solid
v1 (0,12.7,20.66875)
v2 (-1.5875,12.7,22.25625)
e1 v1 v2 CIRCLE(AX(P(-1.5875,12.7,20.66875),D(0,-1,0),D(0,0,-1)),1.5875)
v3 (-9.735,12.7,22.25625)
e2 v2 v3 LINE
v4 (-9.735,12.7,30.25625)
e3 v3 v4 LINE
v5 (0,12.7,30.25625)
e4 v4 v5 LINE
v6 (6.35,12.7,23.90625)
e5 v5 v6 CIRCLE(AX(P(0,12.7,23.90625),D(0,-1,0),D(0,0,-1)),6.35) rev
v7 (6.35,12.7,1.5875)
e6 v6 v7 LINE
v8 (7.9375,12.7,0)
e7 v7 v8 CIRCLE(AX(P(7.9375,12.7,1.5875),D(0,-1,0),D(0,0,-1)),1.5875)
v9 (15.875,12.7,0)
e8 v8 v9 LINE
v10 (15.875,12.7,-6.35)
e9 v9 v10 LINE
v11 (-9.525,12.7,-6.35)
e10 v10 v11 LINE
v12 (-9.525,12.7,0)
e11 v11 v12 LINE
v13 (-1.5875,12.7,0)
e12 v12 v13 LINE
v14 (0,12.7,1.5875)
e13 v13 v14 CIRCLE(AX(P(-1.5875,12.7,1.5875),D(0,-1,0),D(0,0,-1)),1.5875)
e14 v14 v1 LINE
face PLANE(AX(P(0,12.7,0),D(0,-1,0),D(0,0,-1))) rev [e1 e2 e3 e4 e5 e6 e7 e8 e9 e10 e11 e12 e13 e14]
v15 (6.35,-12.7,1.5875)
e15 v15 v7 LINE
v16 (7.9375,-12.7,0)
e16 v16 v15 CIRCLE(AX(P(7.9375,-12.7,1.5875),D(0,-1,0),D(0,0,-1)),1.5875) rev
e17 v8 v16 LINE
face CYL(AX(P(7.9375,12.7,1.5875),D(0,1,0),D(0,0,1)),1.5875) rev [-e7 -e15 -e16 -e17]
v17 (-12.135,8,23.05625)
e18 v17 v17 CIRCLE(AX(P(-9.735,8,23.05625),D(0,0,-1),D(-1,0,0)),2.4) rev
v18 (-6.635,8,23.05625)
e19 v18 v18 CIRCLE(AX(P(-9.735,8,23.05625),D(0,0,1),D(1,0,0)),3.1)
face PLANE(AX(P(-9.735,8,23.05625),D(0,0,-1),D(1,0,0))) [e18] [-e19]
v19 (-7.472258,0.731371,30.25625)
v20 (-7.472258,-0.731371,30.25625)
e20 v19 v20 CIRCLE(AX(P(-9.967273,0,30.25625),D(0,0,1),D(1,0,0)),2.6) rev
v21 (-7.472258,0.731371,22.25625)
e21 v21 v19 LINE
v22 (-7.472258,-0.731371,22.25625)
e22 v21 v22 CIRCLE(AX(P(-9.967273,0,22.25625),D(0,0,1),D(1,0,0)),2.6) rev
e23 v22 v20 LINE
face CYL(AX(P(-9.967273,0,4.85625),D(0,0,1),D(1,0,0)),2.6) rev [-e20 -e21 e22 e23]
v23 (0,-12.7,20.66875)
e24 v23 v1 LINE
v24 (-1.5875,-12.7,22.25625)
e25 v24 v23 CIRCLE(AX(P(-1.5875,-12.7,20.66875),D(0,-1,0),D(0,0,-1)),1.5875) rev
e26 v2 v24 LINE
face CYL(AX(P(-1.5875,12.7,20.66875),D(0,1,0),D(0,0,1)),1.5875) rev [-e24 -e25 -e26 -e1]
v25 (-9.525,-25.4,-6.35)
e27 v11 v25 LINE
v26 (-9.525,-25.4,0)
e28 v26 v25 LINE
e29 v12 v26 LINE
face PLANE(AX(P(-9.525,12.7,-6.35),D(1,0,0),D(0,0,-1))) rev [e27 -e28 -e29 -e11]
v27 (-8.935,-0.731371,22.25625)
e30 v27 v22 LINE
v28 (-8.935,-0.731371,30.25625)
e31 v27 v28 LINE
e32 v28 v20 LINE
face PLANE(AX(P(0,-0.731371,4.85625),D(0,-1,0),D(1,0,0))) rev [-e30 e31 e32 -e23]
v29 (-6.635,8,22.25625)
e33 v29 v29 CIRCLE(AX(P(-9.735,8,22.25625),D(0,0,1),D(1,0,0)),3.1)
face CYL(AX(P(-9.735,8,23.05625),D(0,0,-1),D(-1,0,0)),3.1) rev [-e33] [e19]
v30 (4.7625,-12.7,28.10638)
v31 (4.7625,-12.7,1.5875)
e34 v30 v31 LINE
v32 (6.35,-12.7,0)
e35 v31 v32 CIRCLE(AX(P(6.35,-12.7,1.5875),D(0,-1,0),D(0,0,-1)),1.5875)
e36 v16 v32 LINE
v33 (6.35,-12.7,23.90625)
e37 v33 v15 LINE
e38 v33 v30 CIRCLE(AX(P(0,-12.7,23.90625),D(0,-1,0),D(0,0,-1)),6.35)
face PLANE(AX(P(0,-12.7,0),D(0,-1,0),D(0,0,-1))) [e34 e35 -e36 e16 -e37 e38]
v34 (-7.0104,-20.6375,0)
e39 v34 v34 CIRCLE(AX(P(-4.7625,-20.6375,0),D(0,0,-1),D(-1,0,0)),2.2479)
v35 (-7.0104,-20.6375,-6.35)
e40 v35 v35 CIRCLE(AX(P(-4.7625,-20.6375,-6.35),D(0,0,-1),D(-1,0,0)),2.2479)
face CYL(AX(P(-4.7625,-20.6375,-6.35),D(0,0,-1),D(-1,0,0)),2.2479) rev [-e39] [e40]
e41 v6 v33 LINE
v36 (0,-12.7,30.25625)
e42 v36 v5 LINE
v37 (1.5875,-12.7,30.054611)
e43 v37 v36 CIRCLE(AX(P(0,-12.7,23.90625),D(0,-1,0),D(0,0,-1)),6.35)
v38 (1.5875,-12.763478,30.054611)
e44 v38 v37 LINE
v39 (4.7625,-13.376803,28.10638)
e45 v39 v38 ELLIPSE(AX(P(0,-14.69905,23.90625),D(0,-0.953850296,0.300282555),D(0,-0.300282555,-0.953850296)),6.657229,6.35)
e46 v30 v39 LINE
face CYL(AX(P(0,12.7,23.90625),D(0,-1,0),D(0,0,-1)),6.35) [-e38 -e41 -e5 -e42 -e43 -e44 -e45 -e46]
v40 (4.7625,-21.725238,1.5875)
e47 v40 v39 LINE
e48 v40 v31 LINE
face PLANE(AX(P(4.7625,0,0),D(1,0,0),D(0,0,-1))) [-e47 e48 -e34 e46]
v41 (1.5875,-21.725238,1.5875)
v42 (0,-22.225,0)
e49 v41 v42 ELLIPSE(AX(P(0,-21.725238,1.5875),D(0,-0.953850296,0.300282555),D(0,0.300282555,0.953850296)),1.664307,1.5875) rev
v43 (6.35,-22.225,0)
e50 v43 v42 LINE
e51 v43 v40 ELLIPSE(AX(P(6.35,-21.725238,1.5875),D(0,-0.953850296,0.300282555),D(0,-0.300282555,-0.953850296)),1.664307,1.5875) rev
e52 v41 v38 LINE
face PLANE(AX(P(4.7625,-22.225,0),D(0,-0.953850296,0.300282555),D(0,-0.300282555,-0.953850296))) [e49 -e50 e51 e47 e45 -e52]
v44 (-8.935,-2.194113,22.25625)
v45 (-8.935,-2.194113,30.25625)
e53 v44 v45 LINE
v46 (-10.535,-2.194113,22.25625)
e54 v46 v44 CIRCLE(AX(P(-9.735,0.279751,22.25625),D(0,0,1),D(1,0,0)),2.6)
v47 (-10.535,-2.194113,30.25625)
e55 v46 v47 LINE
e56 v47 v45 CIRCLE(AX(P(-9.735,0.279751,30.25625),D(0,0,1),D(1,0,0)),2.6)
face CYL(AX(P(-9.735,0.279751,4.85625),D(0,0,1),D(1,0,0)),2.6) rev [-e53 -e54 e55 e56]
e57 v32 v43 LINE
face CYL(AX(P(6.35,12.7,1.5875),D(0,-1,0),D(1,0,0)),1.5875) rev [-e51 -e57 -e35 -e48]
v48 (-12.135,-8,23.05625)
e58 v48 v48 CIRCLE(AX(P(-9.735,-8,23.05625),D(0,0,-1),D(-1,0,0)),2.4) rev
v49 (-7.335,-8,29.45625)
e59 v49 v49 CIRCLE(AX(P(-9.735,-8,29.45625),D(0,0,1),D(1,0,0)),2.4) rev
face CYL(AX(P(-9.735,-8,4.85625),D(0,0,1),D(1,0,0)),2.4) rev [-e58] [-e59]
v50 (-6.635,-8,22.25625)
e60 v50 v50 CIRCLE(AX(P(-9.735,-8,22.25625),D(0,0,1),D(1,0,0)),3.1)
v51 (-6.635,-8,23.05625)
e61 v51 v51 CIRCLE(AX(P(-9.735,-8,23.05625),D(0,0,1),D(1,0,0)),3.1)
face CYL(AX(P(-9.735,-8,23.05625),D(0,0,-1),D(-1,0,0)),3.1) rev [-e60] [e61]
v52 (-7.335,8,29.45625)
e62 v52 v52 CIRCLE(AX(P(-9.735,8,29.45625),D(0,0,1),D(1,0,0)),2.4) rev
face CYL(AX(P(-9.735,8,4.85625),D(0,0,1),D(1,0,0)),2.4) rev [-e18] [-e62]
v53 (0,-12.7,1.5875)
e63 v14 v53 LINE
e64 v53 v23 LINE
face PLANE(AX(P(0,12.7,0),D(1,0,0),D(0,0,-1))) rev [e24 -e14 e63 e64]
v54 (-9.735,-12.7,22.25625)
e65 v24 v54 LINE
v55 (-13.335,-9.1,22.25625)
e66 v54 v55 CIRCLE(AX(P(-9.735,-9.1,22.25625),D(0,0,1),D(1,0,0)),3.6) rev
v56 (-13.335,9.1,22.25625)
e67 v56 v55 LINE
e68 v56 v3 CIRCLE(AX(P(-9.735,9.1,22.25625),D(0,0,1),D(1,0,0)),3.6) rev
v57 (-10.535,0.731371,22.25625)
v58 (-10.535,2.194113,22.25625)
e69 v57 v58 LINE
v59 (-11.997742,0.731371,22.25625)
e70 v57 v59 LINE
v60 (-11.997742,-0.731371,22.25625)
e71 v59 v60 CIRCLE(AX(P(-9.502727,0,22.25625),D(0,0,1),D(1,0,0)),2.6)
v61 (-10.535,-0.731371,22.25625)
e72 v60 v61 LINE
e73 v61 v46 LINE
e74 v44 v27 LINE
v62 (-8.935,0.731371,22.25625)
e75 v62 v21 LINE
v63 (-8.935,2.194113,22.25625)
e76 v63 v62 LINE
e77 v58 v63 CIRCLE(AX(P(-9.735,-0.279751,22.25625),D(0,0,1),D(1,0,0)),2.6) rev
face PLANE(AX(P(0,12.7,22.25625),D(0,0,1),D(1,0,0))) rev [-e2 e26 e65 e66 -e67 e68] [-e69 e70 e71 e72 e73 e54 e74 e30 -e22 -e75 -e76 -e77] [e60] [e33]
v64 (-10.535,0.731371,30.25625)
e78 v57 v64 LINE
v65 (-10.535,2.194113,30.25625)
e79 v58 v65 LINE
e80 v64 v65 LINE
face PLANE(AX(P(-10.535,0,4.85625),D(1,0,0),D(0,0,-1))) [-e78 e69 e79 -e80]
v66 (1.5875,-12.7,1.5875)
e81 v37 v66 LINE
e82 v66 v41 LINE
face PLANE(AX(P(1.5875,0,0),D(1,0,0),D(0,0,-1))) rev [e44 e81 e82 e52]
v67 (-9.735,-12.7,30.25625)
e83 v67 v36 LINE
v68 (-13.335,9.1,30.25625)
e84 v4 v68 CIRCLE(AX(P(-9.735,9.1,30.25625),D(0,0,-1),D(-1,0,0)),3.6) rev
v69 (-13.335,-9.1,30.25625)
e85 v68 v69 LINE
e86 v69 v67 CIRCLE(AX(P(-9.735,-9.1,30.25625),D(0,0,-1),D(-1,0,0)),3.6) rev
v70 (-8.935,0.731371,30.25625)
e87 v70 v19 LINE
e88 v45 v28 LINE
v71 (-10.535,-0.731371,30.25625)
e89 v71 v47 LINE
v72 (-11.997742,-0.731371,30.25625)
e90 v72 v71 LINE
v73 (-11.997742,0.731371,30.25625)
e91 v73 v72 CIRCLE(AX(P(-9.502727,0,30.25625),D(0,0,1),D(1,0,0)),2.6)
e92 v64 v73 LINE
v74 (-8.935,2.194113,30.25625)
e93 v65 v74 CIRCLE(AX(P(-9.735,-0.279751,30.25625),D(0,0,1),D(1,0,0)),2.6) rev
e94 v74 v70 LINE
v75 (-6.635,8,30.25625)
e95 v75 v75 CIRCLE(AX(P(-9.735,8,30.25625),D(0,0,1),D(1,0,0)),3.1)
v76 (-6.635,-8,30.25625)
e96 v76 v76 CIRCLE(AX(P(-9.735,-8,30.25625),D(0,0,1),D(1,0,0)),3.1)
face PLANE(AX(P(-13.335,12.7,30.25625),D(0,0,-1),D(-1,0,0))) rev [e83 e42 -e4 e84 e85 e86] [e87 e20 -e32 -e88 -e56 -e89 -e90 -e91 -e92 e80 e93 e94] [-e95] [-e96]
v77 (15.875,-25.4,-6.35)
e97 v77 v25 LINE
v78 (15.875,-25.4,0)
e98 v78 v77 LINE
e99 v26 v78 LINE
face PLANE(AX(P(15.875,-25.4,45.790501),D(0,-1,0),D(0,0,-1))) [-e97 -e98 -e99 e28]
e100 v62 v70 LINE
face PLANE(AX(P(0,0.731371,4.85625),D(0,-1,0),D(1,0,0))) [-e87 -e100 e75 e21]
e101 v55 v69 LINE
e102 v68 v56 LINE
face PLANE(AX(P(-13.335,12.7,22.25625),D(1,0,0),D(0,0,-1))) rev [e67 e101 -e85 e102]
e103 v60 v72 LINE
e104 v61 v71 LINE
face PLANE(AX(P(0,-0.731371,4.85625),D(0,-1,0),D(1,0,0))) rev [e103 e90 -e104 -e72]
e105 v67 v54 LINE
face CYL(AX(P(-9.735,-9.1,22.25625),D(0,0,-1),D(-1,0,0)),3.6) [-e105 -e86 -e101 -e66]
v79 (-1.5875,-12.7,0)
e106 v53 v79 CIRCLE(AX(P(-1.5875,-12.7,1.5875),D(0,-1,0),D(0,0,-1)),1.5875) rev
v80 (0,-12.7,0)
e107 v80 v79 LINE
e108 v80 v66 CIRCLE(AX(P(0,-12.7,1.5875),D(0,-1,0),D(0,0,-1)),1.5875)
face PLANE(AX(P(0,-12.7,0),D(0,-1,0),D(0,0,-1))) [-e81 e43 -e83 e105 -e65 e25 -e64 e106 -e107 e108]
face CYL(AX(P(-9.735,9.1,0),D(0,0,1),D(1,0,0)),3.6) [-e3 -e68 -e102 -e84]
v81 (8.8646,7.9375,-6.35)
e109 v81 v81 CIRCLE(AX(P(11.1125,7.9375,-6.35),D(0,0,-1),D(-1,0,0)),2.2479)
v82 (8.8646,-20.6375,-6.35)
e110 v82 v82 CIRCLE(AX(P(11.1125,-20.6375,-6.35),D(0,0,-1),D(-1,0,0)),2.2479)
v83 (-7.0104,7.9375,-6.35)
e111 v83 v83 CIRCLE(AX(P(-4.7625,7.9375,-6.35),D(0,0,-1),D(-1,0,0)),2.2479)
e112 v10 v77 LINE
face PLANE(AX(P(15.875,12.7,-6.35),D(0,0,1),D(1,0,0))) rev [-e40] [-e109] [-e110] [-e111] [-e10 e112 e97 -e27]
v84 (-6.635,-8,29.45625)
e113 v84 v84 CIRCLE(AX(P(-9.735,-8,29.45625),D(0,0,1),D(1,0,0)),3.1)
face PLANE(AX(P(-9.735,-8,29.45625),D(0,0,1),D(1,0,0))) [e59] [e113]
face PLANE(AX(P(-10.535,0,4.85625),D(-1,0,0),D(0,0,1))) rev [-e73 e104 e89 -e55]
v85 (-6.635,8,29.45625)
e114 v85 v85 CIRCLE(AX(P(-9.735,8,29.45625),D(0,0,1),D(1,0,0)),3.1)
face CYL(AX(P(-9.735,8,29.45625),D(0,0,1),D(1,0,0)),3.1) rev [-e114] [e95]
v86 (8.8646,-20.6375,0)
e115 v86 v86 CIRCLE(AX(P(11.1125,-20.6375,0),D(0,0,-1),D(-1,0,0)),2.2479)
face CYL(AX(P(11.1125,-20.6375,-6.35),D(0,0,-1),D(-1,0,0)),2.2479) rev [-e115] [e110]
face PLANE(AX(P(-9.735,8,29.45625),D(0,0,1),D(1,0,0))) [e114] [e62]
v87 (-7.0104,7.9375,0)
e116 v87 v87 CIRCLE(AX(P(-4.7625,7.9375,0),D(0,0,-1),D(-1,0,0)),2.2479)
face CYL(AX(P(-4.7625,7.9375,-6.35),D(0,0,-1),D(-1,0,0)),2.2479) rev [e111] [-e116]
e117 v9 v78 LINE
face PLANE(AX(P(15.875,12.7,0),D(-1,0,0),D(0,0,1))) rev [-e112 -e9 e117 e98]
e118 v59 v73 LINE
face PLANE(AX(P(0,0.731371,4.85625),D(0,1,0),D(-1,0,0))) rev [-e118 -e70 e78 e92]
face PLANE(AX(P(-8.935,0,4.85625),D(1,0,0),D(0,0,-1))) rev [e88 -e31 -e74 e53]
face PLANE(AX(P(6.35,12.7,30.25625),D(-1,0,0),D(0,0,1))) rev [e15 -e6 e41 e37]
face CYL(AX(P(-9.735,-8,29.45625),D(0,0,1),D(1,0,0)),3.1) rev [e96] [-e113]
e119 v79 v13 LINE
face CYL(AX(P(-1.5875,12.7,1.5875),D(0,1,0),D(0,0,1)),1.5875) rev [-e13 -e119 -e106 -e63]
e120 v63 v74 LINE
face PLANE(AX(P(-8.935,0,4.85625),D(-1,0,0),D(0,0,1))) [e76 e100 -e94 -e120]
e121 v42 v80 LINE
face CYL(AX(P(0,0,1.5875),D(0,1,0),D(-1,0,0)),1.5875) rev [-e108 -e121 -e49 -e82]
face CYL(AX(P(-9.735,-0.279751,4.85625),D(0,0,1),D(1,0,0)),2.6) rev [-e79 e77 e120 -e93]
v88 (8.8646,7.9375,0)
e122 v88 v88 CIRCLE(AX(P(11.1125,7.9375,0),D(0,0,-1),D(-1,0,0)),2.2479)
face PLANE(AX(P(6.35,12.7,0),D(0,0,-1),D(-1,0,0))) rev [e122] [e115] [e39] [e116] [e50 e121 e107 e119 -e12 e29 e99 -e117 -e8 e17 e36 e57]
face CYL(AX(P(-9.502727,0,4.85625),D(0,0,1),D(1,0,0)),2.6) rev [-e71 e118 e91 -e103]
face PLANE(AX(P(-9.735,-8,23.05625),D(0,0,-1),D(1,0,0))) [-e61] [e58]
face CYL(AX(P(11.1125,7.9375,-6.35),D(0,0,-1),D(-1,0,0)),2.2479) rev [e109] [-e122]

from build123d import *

# Parameters (mm, degrees)
BOSS_EXTRUDE1_DEPTH       = 12.7
SKETCH2_R                 = 2.4
CUT_EXTRUDE1_DEPTH        = 25.4
SKETCH2_3_R               = 3.1
CUT_EXTRUDE2_DEPTH        = 0.8
FILLET1_R                 = 3.6
SKETCH7_W                 = 25.4
SKETCH7_H                 = 38.1
BOSS_EXTRUDE2_DEPTH       = 6.35
F_8_CLEARANCE_HOLE1_D     = 4.4958
F_8_CLEARANCE_HOLE1_DEPTH = 6.35
BOSS_EXTRUDE3_DEPTH       = 1.5875
FILLET2_R                 = 6.35
FILLET3_R                 = 1.5875
FILLET4_R                 = 1.5875


# Some blends are built 0.0001 mm under size
with BuildPart() as part:
    # Sketch1 → Boss-Extrude1 (new, symmetric)
    with BuildSketch(Plane(origin=(0, 0, 0), x_dir=(1, 0, 0), z_dir=(0, 1, 0))):
        Polygon((0, 0), (0, -22.256250002), (-13.335, -22.256250002), (-13.335, -30.256250002), (6.35, -30.256250002), (6.35, 0), (15.875, 0), (15.875, 6.35), (-9.525, 6.35), (-9.525, 0), align=None)
    extrude(amount=BOSS_EXTRUDE1_DEPTH, both=True)

    # Sketch2 → Cut-Extrude1 (cut)
    with BuildSketch(Plane.XY.offset(30.256250002)):
        with BuildLine():
            ThreePointArc((-7.4722583, 0.73137085), (-7.367272665, 0), (-7.4722583, -0.73137085))
            Line((-7.4722583, -0.73137085), (-8.935, -0.73137085))
            Line((-8.935, -0.73137085), (-8.935, -2.19411255))
            ThreePointArc((-8.935, -2.19411255), (-9.735, -2.320249175), (-10.535, -2.19411255))
            Line((-10.535, -2.19411255), (-10.535, -0.73137085))
            Line((-10.535, -0.73137085), (-11.9977417, -0.73137085))
            ThreePointArc((-11.9977417, -0.73137085), (-12.102727335, 0), (-11.9977417, 0.73137085))
            Line((-11.9977417, 0.73137085), (-10.535, 0.73137085))
            Line((-10.535, 0.73137085), (-10.535, 2.19411255))
            ThreePointArc((-10.535, 2.19411255), (-9.735, 2.320249175), (-8.935, 2.19411255))
            Line((-8.935, 2.19411255), (-8.935, 0.73137085))
            Line((-8.935, 0.73137085), (-7.4722583, 0.73137085))
        make_face()
        with Locations((-9.735, -8)):
            Circle(SKETCH2_R)
        with Locations((-9.735, 8)):
            Circle(SKETCH2_R)
    extrude(amount=-CUT_EXTRUDE1_DEPTH, mode=Mode.SUBTRACT)

    # Sketch2<3> → Cut-Extrude2 (cut)
    with BuildSketch(Plane.XY.offset(30.256250002)):
        with Locations((-9.735, 8)):
            Circle(SKETCH2_3_R)
        with Locations((-9.735, -8)):
            Circle(SKETCH2_3_R)
    cut_extrude2 = extrude(amount=-CUT_EXTRUDE2_DEPTH, mode=Mode.SUBTRACT)

    # Mirror1: Cut-Extrude2 across plane
    add(cut_extrude2.mirror(Plane.XY.offset(26.256250002)), mode=Mode.SUBTRACT)

    # Fillet1
    fillet1_edges = [part.edges().sort_by_distance(p)[0] for p in [
        (-13.335, -12.7, 26.256250002),
        (-13.335, 12.7, 26.256250002),
    ]]
    fillet(fillet1_edges, radius=FILLET1_R)

    # Sketch7 → Boss-Extrude2 (add)
    with BuildSketch(Plane(origin=(0, 0, -6.35), x_dir=(-1, 0, 0), z_dir=(0, 0, -1))):
        with Locations((-3.175, -6.35)):
            Rectangle(SKETCH7_W, SKETCH7_H)
    extrude(amount=-BOSS_EXTRUDE2_DEPTH)

    # #8 Clearance Hole1
    with Locations(Plane(origin=(0, 0, -6.35), x_dir=(-1, 0, 0), z_dir=(0, 0, -1))):
        with Locations((-11.1125, 7.9375), (4.7625, 7.9375), (4.7625, -20.6375), (-11.1125, -20.6375)):
            Hole(F_8_CLEARANCE_HOLE1_D / 2, depth=F_8_CLEARANCE_HOLE1_DEPTH)

    # Sketch8 → Boss-Extrude3 (add, symmetric)
    with BuildSketch(Plane(origin=(3.175, 0, 0), x_dir=(0, 0, -1), z_dir=(1, 0, 0))):
        Polygon((0, -22.225), (-30.256250002, -12.7), (0, -12.7), align=None)
    extrude(amount=BOSS_EXTRUDE3_DEPTH, both=True)

    # Fillet2
    # the kernel refuses this fillet: 6.35 mm, written as the material it takes off along each edge
    with BuildSketch(Plane(origin=(6.35, -28.575, 30.256250002), x_dir=(-1, 0, 0), z_dir=(0, 1, 0))) as fillet2_piece_1:
        with BuildLine():
            CenterArc((FILLET2_R, -FILLET2_R), FILLET2_R, 90, 90)
            Line((0, -FILLET2_R), (0, 0))
            Line((0, 0), (FILLET2_R, 0))
        make_face()
    extrude(amount=57.15, mode=Mode.SUBTRACT)

    # Fillet3
    fillet3_edges = [part.edges().sort_by_distance(p)[0] for p in [
        (0, 0, 22.256250002),
    ]]
    fillet(fillet3_edges, radius=FILLET3_R)

    # Fillet4
    fillet4_edges = [part.edges().sort_by_distance(p)[0] for p in [
        (0, 0, 0),
        (6.35, 0, 0),
        (1.5875, -17.4625, 0),
        (4.7625, -17.4625, 0),
    ]]
    fillet(fillet4_edges, radius=FILLET4_R - 0.0001)  # a hair under: the kernel refuses the full size


solid = part.part
